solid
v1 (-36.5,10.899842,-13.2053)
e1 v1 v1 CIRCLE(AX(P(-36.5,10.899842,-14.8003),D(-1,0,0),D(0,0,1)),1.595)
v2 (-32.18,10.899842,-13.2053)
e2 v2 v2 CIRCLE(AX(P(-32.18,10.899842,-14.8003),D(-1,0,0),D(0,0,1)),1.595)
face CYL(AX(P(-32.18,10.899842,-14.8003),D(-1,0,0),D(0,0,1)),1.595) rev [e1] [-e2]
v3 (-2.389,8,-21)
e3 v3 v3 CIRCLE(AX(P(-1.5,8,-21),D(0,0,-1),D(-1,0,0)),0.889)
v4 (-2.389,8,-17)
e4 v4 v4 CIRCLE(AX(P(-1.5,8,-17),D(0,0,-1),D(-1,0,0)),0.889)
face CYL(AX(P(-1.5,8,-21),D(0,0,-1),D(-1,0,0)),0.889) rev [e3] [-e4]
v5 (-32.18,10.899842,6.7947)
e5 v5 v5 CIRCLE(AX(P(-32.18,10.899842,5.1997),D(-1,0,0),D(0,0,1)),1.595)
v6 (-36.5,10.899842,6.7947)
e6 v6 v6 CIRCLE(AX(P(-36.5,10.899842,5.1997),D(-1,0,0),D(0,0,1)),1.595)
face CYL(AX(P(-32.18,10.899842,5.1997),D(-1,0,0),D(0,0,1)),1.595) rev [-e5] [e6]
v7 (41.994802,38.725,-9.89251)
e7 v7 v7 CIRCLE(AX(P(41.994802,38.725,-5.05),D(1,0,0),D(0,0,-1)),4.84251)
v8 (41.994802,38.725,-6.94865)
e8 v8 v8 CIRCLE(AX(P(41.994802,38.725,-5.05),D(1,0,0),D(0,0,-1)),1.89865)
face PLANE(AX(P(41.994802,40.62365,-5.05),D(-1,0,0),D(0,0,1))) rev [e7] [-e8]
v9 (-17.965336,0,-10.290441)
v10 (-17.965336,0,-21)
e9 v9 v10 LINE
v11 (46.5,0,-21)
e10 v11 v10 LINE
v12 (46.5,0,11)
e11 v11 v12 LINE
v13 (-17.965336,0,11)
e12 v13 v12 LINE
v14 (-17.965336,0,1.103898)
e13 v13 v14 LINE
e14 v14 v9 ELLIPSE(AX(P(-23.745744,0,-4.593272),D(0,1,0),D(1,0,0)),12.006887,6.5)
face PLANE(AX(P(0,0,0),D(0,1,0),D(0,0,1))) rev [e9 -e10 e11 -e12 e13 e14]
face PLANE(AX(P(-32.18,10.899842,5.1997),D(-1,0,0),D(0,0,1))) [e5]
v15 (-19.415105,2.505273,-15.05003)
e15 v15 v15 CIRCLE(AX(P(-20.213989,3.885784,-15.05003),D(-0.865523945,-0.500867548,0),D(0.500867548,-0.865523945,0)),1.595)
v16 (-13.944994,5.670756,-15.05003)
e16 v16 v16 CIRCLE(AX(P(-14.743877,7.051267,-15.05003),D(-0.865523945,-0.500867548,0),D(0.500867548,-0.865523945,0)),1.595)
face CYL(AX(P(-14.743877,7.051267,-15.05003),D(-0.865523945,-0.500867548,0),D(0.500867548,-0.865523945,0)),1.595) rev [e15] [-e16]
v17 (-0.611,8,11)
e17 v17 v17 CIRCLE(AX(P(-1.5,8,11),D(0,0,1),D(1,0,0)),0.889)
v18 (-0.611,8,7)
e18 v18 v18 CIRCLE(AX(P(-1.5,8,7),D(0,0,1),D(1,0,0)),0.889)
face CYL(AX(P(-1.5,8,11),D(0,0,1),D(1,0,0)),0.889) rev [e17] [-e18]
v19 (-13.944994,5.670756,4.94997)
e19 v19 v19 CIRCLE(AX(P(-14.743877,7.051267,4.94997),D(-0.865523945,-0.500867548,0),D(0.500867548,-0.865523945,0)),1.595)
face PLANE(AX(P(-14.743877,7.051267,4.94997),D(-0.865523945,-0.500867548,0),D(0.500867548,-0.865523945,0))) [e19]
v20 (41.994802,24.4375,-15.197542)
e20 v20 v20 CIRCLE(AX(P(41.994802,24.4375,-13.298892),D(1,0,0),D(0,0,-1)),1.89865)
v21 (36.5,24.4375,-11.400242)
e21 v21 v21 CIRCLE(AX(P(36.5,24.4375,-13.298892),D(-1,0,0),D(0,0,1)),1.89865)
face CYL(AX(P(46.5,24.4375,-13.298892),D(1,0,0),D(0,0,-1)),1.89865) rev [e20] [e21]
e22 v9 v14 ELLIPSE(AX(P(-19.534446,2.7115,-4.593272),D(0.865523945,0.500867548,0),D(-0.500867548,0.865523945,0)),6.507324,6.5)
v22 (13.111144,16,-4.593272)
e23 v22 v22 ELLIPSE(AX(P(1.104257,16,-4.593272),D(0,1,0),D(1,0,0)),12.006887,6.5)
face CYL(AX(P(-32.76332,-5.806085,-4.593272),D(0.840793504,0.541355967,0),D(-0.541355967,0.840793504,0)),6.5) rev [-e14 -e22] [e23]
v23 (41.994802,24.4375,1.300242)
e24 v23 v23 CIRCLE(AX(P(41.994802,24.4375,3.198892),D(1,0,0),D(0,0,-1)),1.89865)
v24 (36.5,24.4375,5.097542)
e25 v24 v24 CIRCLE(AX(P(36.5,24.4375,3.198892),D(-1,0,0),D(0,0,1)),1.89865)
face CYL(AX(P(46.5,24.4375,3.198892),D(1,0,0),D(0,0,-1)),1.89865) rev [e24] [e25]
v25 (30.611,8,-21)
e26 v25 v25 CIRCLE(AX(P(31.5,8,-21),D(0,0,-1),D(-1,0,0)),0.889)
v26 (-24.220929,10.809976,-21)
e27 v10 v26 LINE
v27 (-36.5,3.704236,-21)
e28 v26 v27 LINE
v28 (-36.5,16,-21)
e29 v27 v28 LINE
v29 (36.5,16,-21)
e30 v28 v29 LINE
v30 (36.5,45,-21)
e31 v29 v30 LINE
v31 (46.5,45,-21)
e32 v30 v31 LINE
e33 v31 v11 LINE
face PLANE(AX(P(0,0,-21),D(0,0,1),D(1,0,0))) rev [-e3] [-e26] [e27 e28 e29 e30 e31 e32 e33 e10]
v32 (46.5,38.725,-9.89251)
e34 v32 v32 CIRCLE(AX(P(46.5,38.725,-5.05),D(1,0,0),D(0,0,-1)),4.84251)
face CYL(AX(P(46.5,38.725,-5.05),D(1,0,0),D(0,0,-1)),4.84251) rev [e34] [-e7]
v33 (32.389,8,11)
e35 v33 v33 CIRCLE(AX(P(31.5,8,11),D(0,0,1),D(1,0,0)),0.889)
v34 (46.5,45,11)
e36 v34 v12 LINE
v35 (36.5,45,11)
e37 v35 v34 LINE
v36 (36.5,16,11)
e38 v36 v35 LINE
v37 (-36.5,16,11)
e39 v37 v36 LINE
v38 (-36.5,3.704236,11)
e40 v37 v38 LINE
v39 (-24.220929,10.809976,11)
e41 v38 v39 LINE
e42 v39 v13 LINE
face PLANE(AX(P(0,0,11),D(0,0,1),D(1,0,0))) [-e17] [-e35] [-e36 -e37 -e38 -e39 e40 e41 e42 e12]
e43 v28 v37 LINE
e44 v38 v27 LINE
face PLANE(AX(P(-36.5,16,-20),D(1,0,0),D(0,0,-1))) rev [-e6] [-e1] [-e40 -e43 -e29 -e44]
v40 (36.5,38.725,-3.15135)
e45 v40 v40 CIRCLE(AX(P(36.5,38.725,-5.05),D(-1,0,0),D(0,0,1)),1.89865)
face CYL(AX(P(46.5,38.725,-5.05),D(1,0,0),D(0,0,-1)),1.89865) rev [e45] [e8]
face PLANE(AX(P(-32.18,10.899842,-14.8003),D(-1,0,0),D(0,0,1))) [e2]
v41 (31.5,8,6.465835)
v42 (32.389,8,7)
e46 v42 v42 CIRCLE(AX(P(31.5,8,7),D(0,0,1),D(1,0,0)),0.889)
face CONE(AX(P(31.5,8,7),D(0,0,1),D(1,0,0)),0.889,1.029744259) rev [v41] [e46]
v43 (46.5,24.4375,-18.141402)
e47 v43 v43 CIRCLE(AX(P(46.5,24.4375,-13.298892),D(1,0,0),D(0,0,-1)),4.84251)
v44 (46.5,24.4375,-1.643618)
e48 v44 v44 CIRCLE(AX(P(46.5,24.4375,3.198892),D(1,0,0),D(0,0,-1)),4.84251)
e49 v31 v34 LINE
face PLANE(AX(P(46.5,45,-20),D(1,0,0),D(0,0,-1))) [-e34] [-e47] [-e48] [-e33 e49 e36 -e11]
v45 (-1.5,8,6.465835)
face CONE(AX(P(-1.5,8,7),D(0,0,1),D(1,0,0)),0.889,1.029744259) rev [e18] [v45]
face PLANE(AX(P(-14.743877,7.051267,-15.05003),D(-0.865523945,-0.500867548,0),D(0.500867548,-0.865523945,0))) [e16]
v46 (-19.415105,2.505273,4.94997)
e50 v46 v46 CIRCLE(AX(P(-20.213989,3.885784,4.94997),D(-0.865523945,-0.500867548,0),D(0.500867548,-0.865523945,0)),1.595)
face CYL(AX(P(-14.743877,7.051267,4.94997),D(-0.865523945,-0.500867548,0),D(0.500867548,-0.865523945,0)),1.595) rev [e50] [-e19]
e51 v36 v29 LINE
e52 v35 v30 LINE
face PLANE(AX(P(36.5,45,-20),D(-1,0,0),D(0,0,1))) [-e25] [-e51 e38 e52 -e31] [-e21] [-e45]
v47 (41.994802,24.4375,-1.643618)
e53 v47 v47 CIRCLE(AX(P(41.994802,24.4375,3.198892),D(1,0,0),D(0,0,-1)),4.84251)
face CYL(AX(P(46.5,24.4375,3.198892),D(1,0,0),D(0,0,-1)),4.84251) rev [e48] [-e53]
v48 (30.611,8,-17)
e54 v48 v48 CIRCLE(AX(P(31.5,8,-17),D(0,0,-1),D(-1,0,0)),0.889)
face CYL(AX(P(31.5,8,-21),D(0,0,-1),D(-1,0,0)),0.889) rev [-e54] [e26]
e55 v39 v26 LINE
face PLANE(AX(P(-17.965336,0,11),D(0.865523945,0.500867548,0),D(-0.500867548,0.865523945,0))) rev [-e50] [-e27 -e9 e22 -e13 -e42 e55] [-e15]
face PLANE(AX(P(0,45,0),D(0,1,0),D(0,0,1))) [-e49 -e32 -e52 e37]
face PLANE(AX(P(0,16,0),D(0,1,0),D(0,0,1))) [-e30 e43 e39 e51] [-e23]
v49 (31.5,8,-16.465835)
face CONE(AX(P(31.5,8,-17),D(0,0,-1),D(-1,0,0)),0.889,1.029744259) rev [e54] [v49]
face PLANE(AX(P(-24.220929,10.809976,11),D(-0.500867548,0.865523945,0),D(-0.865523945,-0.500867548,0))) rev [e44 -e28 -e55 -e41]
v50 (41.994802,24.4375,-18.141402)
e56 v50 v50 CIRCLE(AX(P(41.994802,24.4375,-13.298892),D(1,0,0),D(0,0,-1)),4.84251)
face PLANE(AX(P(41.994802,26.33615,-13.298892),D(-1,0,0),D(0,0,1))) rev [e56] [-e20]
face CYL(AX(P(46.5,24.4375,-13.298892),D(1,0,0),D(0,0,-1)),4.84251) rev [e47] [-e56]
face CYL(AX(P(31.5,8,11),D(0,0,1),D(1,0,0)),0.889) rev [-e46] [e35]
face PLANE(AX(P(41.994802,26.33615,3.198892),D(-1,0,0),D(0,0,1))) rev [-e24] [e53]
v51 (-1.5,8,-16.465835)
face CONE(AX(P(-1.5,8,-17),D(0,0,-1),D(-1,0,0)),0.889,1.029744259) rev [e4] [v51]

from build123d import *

# Parameters (mm, degrees)
SKETCH1_W                                      = 73
SKETCH1_H                                      = 40
BOSS_EXTRUDE1_DEPTH                            = 16
CUT_EXTRUDE1_DEPTH                             = 31
CUT_EXTRUDE2_REACH                             = 59.847
SKETCH14_R                                     = 6.5
CUT_EXTRUDE2_DIRECTION_2_REACH                 = 59.847
SKETCH15_R                                     = 1.595
CUT_EXTRUDE3_DEPTH                             = 4.32
SKETCH16_R                                     = 1.595
CUT_EXTRUDE4_DEPTH                             = 6.32
SKETCH18_R                                     = 1.595
CUT_EXTRUDE6_DEPTH                             = 6.32
SKETCH26_W                                     = 10
SKETCH26_H                                     = 40
BOSS_EXTRUDE2_DEPTH                            = 45
SKETCH27_R                                     = 1.595
CUT_EXTRUDE7_DEPTH                             = 97.509066932
SKETCH28_R                                     = 1.595
CUT_EXTRUDE10_DEPTH                            = 6.32
BOSS_EXTRUDE3_DEPTH                            = 1
SKETCH37_R                                     = 1.595
CUT_EXTRUDE14_DEPTH                            = 6.78
CUT_EXTRUDE15_START                            = -6.78
SKETCH38_R                                     = 1.595
CUT_EXTRUDE15_DEPTH                            = 6.78
SKETCH52_W                                     = 101.196897311
SKETCH52_H                                     = 58.467472524
CUT_EXTRUDE21_DEPTH                            = 9
CBORE_FOR_6_SOCKET_HEAD_CAP_SCREW1_D           = 3.7973
CBORE_FOR_6_SOCKET_HEAD_CAP_SCREW1_DEPTH       = 46.5
CBORE_FOR_6_SOCKET_HEAD_CAP_SCREW1_CBORE_D     = 9.68502
CBORE_FOR_6_SOCKET_HEAD_CAP_SCREW1_CBORE_DEPTH = 4.505198
CBORE_FOR_6_SOCKET_HEAD_CAP_SCREW1_TIP         = 1.140824014


# Read off the part's stored shape, not the designer's step: AdvancedHole3, AdvancedHole4
with BuildPart() as part:
    # Sketch1 → Boss-Extrude1 (new body)
    with BuildSketch(Plane(origin=(0, 0, 0), x_dir=(1, 0, 0), z_dir=(0, 1, 0))):
        Rectangle(SKETCH1_W, SKETCH1_H)
    extrude(amount=BOSS_EXTRUDE1_DEPTH)

    # Sketch5 → Cut-Extrude1 (cut)
    with BuildSketch(Plane(origin=(0, 0, -20), x_dir=(-1, 0, 0), z_dir=(0, 0, -1))):
        Polygon((17.965335593, 0), (24.220929062, 10.809975543), (36.5, 3.704235511), (36.5, 0), align=None)
    extrude(amount=-CUT_EXTRUDE1_DEPTH, mode=Mode.SUBTRACT)

    # Sketch14 → Cut-Extrude2 (cut, up to next)
    with BuildSketch(Plane(origin=(2.103927099, 16, -20), x_dir=(0, 0, 1), z_dir=(-0.8407935043817242, -0.5413559669842936, 0)), mode=Mode.PRIVATE) as cut_extrude2_sk1:
        with Locations(Location((15.40672826, 0.54117756, 0), (0, 0, 208.778472392))):
            Circle(SKETCH14_R)
    cut_extrude2_tool1 = extrude(cut_extrude2_sk1.sketch, amount=-CUT_EXTRUDE2_REACH, mode=Mode.PRIVATE) & part.part
    add(cut_extrude2_tool1.solids().sort_by_distance((1.810957, 16.455019, -4.593272))[0], mode=Mode.SUBTRACT)

    # Sketch14 → Cut-Extrude2 direction 2 (cut, up to next)
    with BuildSketch(Plane(origin=(2.103927099, 16, -20), x_dir=(0, 0, 1), z_dir=(-0.8407935043817242, -0.5413559669842936, 0)), mode=Mode.PRIVATE) as cut_extrude2_direction_2_sk1:
        with Locations(Location((15.40672826, 0.54117756, 0), (0, 0, 208.778472392))):
            Circle(SKETCH14_R)
    cut_extrude2_direction_2_tool1 = extrude(cut_extrude2_direction_2_sk1.sketch, amount=CUT_EXTRUDE2_DIRECTION_2_REACH, mode=Mode.PRIVATE) & part.part
    add(cut_extrude2_direction_2_tool1.solids().sort_by_distance((1.810957, 16.455019, -4.593272))[0], mode=Mode.SUBTRACT)

    # Sketch15 → Cut-Extrude3 (cut)
    with BuildSketch(Plane.ZY.offset(36.5)):
        with Locations((-14.800300311, 10.899842323)):
            Circle(SKETCH15_R)
        with Locations((5.199699689, 10.899842323)):
            Circle(SKETCH15_R)
    extrude(amount=-CUT_EXTRUDE3_DEPTH, mode=Mode.SUBTRACT)

    # Sketch16 → Cut-Extrude4 (cut)
    with BuildSketch(Plane(origin=(-13.45840239, -7.788203938, 0), x_dir=(0, 0, 1), z_dir=(-0.8655239452556988, -0.5008675475502585, 0))):
        with Locations(Location((-15.050029961, 13.487770019, 0), (0, 0, 270))):
            Circle(SKETCH16_R)
        with Locations(Location((4.949970039, 13.487770019, 0), (0, 0, 270))):
            Circle(SKETCH16_R)
    extrude(amount=-CUT_EXTRUDE4_DEPTH, mode=Mode.SUBTRACT)

    # Sketch18 → Cut-Extrude6 (cut)
    with BuildSketch(Plane.XY.offset(20)):
        with Locations((19, 8)):
            Circle(SKETCH18_R)
        with Locations((-19, 8)):
            Circle(SKETCH18_R)
    extrude(amount=-CUT_EXTRUDE6_DEPTH, mode=Mode.SUBTRACT)

    # Sketch26 → Boss-Extrude2 (add)
    with BuildSketch(Plane.XZ):
        with Locations((41.5, 0)):
            Rectangle(SKETCH26_W, SKETCH26_H)
    extrude(amount=-BOSS_EXTRUDE2_DEPTH)

    # Sketch27 → Cut-Extrude7 (cut, through all)
    with BuildSketch(Plane(origin=(46.5, 0, 0), x_dir=(0, 0, -1), z_dir=(1, 0, 0))):
        with Locations((5.05, 38.725)):
            Circle(SKETCH27_R)
        with Locations((13.298891971, 24.4375)):
            Circle(SKETCH27_R)
        with Locations((-3.198891971, 24.4375)):
            Circle(SKETCH27_R)
    extrude(amount=-CUT_EXTRUDE7_DEPTH, mode=Mode.SUBTRACT)

    # Sketch28 → Cut-Extrude10 (cut)
    with BuildSketch(Plane.XY.offset(20)):
        with Locations((41.5, 22.5)):
            Circle(SKETCH28_R)
    extrude(amount=-CUT_EXTRUDE10_DEPTH, mode=Mode.SUBTRACT)

    # Sketch33 → Boss-Extrude3 (add)
    with BuildSketch(Plane(origin=(0, 0, -20), x_dir=(-1, 0, 0), z_dir=(0, 0, -1))):
        Polygon((-46.5, 45), (-36.5, 45), (-36.5, 16), (36.5, 16), (36.5, 3.704235511), (24.220929062, 10.809975543), (17.965335593, 0), (-46.5, 0), align=None)
    extrude(amount=BOSS_EXTRUDE3_DEPTH)

    # Sketch37 → Cut-Extrude14 (cut)
    with BuildSketch(Plane.ZY.offset(36.5)):
        with Locations((15.5, 7.999173791)):
            Circle(SKETCH37_R)
    extrude(amount=-CUT_EXTRUDE14_DEPTH, mode=Mode.SUBTRACT)

    # Sketch38 → Cut-Extrude15 (cut)
    with BuildSketch(Plane(origin=(46.5, 0, 0), x_dir=(0, 0, -1), z_dir=(1, 0, 0)).offset(CUT_EXTRUDE15_START)):
        with Locations(Location((-15.5, 7.999173791, 0), (0, 0, 180))):
            Circle(SKETCH38_R)
    extrude(amount=CUT_EXTRUDE15_DEPTH, mode=Mode.SUBTRACT)

    # Sketch52 → Cut-Extrude21 (cut)
    with BuildSketch(Plane(origin=(0, 0, 11), x_dir=(-1, 0, 0), z_dir=(0, 0, -1))):
        with Locations((-4.130814665, 20.01964795)):
            Rectangle(SKETCH52_W, SKETCH52_H)
    extrude(amount=-CUT_EXTRUDE21_DEPTH, mode=Mode.SUBTRACT)

    # CBORE for #6 Socket Head Cap Screw1
    with Locations(Plane(origin=(46.5, 0, 0), x_dir=(0, 0, -1), z_dir=(1, 0, 0))):
        with Locations((5.05, 38.725), (13.298891971, 24.4375), (-3.198891971, 24.4375)):
            CounterBoreHole(CBORE_FOR_6_SOCKET_HEAD_CAP_SCREW1_D / 2, CBORE_FOR_6_SOCKET_HEAD_CAP_SCREW1_CBORE_D / 2, CBORE_FOR_6_SOCKET_HEAD_CAP_SCREW1_CBORE_DEPTH, depth=CBORE_FOR_6_SOCKET_HEAD_CAP_SCREW1_DEPTH)
            with Locations((0, 0, -(CBORE_FOR_6_SOCKET_HEAD_CAP_SCREW1_DEPTH + CBORE_FOR_6_SOCKET_HEAD_CAP_SCREW1_TIP / 2))):  # 118° drill point
                Cone(0, CBORE_FOR_6_SOCKET_HEAD_CAP_SCREW1_D / 2, CBORE_FOR_6_SOCKET_HEAD_CAP_SCREW1_TIP, mode=Mode.SUBTRACT)

    # AdvancedHole3 outline → AdvancedHole3 (revolve, cut)
    with BuildSketch(Plane(origin=(-1.5, 8, 0), x_dir=(1, 0, 0), z_dir=(0, -1, 0))):
        Polygon((0.889, -21), (0.889, -17.000000126), (0, -16.465835036), (0, -21), align=None)
    revolve(axis=Axis((-1.5, 8, 0), (0, 0, 1)), mode=Mode.SUBTRACT)

    # AdvancedHole3 2 outline → AdvancedHole3 2 (revolve, cut)
    with BuildSketch(Plane(origin=(31.5, 8, 0), x_dir=(1, 0, 0), z_dir=(0, -1, 0))):
        Polygon((0.889, -21), (0.889, -17.000000126), (0, -16.465835036), (0, -21), align=None)
    revolve(axis=Axis((31.5, 8, 0), (0, 0, 1)), mode=Mode.SUBTRACT)

    # AdvancedHole4 outline → AdvancedHole4 (revolve, cut)
    with BuildSketch(Plane(origin=(-1.5, 8, 0), x_dir=(1, 0, 0), z_dir=(0, -1, 0))):
        Polygon((0, 6.465835036), (0.889, 7.000000126), (0.889, 11), (0, 11), align=None)
    revolve(axis=Axis((-1.5, 8, 0), (0, 0, 1)), mode=Mode.SUBTRACT)

    # AdvancedHole4 2 outline → AdvancedHole4 2 (revolve, cut)
    with BuildSketch(Plane(origin=(31.5, 8, 0), x_dir=(1, 0, 0), z_dir=(0, -1, 0))):
        Polygon((0, 6.465835036), (0.889, 7.000000126), (0.889, 11), (0, 11), align=None)
    revolve(axis=Axis((31.5, 8, 0), (0, 0, 1)), mode=Mode.SUBTRACT)


solid = part.part
